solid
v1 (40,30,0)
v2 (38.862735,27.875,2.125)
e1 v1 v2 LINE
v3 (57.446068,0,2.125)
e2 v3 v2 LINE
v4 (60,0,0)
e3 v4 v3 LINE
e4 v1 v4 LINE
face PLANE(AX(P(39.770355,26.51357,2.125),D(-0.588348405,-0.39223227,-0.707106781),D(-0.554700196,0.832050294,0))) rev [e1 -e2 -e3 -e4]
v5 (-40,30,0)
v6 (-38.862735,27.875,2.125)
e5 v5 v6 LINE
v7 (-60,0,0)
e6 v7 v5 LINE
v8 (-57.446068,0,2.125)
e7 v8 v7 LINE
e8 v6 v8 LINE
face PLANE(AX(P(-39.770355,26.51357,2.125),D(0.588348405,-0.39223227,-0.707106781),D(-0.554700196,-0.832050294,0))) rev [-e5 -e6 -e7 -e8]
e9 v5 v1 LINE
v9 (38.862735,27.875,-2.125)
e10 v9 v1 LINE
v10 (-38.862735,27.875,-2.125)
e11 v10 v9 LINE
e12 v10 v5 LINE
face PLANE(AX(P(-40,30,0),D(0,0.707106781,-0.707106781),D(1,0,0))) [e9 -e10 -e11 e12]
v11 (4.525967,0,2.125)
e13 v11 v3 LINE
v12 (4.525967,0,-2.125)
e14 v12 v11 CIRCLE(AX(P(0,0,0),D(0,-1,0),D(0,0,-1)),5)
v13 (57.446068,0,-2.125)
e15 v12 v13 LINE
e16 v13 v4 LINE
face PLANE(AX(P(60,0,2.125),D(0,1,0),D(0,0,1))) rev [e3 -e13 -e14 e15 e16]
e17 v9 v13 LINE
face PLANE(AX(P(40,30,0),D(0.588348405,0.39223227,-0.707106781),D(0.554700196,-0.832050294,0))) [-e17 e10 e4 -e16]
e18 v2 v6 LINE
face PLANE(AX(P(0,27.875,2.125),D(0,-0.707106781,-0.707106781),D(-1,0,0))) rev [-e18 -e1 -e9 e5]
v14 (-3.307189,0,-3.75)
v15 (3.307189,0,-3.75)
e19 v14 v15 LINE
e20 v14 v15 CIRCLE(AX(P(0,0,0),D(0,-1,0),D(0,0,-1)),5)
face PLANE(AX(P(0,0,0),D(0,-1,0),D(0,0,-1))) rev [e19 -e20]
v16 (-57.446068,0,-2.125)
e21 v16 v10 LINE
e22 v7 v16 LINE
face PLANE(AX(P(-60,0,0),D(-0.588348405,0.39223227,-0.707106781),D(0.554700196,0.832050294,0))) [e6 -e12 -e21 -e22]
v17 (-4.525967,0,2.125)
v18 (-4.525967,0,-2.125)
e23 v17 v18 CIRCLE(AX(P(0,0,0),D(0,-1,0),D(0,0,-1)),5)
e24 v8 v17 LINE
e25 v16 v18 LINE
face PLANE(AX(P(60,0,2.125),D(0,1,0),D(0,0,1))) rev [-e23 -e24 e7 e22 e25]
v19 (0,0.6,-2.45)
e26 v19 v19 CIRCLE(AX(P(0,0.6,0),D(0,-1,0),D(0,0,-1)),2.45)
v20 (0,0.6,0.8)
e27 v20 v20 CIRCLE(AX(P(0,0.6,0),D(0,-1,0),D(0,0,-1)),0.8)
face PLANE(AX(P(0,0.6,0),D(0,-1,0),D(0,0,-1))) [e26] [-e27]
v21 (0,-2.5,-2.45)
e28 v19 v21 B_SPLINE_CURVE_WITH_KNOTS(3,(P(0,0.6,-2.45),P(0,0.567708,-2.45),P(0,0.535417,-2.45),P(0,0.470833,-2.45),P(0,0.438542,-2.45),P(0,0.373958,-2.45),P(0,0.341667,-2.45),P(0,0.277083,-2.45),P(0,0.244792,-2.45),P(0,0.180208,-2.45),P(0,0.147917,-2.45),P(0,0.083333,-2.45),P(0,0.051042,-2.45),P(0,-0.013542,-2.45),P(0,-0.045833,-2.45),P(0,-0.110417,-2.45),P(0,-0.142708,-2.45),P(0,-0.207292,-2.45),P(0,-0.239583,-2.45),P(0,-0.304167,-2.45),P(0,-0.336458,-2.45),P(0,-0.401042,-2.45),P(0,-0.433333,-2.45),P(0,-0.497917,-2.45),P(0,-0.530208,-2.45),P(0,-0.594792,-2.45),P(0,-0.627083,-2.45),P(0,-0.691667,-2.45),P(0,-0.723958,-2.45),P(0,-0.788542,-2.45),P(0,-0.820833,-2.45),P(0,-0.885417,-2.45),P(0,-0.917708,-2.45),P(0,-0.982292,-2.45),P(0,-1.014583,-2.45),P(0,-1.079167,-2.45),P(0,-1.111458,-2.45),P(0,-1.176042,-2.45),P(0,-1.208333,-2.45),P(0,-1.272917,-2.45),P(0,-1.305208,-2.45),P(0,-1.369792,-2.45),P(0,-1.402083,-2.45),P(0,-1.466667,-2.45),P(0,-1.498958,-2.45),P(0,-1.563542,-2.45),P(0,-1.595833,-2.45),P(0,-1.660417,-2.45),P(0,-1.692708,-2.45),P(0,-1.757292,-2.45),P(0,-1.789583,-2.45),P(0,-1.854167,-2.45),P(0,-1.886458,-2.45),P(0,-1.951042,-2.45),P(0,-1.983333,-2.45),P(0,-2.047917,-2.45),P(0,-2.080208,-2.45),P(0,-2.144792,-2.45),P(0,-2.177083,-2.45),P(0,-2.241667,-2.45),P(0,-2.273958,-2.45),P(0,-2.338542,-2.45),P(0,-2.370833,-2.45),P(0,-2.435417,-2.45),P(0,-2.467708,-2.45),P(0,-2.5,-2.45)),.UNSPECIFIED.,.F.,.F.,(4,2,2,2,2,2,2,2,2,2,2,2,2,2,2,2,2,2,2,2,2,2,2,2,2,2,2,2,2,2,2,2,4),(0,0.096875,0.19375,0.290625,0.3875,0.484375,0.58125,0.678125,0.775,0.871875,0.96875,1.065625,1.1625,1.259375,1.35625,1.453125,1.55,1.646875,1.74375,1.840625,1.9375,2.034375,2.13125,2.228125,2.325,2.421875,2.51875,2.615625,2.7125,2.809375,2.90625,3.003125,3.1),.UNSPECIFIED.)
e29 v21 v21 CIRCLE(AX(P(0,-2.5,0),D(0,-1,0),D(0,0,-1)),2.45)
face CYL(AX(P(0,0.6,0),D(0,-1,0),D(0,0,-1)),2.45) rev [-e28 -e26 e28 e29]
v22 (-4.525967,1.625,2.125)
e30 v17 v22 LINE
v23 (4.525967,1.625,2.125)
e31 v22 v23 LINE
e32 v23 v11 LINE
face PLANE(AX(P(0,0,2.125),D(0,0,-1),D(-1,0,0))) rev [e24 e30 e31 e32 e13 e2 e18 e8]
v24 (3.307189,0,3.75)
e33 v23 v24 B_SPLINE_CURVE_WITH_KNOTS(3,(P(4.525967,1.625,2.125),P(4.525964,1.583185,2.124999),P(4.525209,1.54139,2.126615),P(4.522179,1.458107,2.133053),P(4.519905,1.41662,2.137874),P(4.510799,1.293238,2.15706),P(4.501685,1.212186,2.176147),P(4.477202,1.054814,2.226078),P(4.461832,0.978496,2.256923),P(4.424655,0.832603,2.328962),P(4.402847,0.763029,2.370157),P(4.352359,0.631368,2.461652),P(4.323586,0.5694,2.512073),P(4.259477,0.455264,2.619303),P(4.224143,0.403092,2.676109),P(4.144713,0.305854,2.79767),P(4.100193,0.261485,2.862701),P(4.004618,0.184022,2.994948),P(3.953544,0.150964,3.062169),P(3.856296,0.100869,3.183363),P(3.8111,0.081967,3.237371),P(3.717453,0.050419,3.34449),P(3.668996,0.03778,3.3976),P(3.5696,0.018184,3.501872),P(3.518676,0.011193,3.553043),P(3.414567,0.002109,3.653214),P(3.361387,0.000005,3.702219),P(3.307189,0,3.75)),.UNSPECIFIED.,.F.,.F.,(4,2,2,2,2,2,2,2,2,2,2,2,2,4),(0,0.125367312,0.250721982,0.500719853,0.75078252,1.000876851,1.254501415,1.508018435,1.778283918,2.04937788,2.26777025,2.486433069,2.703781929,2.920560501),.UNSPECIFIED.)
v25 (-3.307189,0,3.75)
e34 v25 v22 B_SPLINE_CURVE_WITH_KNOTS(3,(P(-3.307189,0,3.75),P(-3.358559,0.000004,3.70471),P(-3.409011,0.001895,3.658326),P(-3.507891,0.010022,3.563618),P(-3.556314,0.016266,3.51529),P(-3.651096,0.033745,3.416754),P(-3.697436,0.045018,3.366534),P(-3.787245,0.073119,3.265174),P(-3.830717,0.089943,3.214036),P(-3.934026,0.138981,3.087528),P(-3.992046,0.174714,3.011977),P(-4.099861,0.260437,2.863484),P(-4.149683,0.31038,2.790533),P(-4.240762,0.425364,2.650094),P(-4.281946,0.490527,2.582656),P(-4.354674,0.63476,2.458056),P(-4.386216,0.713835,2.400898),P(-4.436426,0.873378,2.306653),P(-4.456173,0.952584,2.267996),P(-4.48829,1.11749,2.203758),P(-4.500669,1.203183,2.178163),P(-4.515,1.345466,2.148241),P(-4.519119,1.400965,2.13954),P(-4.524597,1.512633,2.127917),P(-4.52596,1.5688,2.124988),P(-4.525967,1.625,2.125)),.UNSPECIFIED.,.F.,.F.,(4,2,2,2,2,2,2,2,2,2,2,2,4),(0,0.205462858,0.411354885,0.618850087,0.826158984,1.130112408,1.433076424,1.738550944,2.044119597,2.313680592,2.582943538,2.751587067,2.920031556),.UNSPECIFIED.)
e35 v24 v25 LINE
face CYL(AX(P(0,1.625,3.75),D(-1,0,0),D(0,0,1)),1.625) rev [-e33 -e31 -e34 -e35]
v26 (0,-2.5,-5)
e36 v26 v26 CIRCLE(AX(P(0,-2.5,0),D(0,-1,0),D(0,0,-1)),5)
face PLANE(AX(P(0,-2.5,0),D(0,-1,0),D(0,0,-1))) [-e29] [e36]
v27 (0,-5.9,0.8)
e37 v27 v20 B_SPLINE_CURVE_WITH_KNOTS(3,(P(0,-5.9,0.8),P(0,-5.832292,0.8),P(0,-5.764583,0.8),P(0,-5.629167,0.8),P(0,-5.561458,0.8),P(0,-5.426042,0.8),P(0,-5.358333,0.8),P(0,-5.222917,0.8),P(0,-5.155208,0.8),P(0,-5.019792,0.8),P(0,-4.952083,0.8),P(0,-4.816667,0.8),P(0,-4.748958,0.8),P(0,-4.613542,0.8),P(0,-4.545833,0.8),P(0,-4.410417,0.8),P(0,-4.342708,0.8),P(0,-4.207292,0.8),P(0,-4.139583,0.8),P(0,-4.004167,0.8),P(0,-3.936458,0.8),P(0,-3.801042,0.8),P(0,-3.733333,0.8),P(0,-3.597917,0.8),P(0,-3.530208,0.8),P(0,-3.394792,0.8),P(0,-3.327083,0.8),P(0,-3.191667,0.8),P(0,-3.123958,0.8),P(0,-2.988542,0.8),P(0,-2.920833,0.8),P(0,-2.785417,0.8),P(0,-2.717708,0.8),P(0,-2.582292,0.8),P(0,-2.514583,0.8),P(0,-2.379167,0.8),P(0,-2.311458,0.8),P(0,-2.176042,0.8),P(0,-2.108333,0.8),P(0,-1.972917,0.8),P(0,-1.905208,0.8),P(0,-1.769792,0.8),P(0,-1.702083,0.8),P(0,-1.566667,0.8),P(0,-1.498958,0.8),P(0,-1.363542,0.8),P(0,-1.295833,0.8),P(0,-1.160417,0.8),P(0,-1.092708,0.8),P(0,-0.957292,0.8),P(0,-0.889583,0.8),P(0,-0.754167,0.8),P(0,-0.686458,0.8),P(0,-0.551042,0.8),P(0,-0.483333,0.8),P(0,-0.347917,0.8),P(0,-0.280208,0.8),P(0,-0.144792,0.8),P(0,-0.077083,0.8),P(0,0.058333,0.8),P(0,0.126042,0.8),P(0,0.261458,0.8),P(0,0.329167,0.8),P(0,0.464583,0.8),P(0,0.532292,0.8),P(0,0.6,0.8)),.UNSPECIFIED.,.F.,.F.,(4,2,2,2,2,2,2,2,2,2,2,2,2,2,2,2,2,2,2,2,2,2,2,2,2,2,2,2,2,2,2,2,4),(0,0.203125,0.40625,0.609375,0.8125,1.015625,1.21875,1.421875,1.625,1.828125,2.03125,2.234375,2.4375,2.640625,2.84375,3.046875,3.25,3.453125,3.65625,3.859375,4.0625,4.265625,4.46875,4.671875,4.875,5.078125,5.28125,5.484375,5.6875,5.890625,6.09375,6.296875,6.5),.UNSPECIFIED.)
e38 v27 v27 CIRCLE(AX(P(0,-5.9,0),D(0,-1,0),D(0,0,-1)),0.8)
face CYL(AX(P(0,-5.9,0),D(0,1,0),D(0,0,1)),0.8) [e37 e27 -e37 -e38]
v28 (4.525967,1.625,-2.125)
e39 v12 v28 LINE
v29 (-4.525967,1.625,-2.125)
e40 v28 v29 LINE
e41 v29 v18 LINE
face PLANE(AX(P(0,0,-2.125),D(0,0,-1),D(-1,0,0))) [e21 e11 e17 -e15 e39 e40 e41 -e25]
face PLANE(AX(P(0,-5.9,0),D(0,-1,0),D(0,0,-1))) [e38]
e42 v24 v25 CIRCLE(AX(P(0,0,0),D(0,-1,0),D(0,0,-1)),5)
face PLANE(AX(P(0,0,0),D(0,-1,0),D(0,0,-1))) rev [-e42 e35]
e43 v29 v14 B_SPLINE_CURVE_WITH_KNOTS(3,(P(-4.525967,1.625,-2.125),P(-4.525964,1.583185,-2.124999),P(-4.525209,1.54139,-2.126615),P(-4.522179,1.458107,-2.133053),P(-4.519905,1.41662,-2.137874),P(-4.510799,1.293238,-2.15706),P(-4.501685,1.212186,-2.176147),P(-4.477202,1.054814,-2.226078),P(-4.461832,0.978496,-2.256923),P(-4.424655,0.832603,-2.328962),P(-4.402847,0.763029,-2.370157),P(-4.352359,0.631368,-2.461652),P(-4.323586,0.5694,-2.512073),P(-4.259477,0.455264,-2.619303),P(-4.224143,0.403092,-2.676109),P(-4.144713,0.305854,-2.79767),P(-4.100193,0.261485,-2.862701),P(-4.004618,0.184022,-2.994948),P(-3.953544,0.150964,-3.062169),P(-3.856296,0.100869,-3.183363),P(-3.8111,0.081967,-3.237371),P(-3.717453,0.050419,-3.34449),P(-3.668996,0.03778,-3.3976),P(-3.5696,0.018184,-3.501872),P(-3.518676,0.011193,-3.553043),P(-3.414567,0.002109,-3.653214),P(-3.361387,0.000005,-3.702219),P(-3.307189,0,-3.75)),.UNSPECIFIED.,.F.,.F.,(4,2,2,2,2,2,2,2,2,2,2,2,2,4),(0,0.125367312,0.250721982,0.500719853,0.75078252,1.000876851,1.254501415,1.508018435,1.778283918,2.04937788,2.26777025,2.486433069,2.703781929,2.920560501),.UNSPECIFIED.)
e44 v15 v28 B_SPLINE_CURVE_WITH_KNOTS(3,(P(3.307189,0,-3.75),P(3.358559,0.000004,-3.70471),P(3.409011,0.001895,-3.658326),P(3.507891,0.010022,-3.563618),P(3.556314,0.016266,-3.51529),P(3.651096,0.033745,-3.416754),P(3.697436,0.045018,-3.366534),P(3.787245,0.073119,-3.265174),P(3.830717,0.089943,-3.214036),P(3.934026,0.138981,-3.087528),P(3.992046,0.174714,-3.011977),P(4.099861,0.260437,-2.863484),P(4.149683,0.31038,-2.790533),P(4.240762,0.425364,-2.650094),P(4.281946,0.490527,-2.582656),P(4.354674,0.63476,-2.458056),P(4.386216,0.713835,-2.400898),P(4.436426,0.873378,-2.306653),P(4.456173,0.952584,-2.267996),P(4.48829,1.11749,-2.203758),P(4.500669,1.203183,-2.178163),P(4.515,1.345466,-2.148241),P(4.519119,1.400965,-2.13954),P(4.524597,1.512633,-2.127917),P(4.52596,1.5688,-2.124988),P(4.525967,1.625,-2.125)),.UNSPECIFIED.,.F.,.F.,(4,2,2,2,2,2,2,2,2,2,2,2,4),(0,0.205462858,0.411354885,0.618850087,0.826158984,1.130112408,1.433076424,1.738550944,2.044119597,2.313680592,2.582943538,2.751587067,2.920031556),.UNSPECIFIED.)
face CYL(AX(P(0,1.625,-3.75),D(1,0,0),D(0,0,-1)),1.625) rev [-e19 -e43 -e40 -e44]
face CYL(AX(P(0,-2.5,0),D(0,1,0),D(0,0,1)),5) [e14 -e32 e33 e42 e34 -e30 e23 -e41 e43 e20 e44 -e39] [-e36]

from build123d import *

# Parameters (mm, degrees)
SALIENTE_EXTRUIR1_DEPTH = 2.125
CROQUIS2_R              = 5
SALIENTE_EXTRUIR2_DEPTH = 2.5
REDONDEO1_R             = 1.625
SKETCH1_R               = 2.45
CUT_EXTRUDE1_DEPTH      = 3.1
CHAMFER1_SIZE           = 2.125
CROQUIS3_R              = 0.8
SALIENTE_EXTRUIR3_DEPTH = 6.5


# Some blends are built 0.0001 mm under size
with BuildPart() as part:
    # Croquis1 → Saliente-Extruir1 (new, symmetric)
    with BuildSketch(Plane.XY):
        Polygon((60, 0), (-60, 0), (-40, 30), (40, 30), align=None)
    extrude(amount=SALIENTE_EXTRUIR1_DEPTH, both=True)

    # Croquis2 → Saliente-Extruir2 (add)
    with BuildSketch(Plane.XZ):
        with Locations(Location((0, 0, 0), (0, 0, 25.150663413))):
            Circle(CROQUIS2_R)
    extrude(amount=SALIENTE_EXTRUIR2_DEPTH)

    # Redondeo1
    # the kernel refuses this fillet: 1.625 mm, written as the material it adds along each edge
    with BuildSketch(Plane(origin=(8.588466748, 0, -2.125), x_dir=(0, 1, 0), z_dir=(-1, 0, 0))) as redondeo1_piece_1_section:
        with BuildLine():
            CenterArc((REDONDEO1_R, REDONDEO1_R), REDONDEO1_R, 180, 90)
            Line((0, REDONDEO1_R), (0, 0))
            Line((0, 0), (REDONDEO1_R, 0))
        make_face()
    redondeo1_piece_1 = extrude(amount=17.176933495, mode=Mode.PRIVATE)
    redondeo1_piece_1 = redondeo1_piece_1 & Plane(origin=(0, 0.370660795, 0), x_dir=(0.9051933495081991, 0, 0.4250000000072087), z_dir=(0, 1, 0)) * Cylinder(5, 41, mode=Mode.PRIVATE)
    add(redondeo1_piece_1)
    with BuildSketch(Plane(origin=(8.588466748, 0, 2.125), x_dir=(0, 1, 0), z_dir=(-1, 0, 0))) as redondeo1_piece_2_section:
        with BuildLine():
            CenterArc((REDONDEO1_R, -REDONDEO1_R), REDONDEO1_R, 90, 90)
            Line((0, -REDONDEO1_R), (0, 0))
            Line((0, 0), (REDONDEO1_R, 0))
        make_face()
    redondeo1_piece_2 = extrude(amount=17.176933495, mode=Mode.PRIVATE)
    redondeo1_piece_2 = redondeo1_piece_2 & Plane(origin=(0, 0.370660827, 0), x_dir=(0.9051933495081991, 0, 0.4250000000072087), z_dir=(0, 1, 0)) * Cylinder(5, 41, mode=Mode.PRIVATE)
    add(redondeo1_piece_2)

    # Sketch1 → Cut-Extrude1 (cut)
    with BuildSketch(Plane.XZ.offset(2.5)):
        with Locations(Location((0, 0, 0), (0, 0, 270))):
            Circle(SKETCH1_R)
    extrude(amount=-CUT_EXTRUDE1_DEPTH, mode=Mode.SUBTRACT)

    # Chamfer1
    chamfer1_edges = [part.edges().sort_by_distance(p)[0] for p in [
        (50, 15, -2.125),
        (0, 30, -2.125),
        (-50, 15, -2.125),
        (50, 15, 2.125),
        (0, 30, 2.125),
        (-50, 15, 2.125),
    ]]
    chamfer(chamfer1_edges, length=CHAMFER1_SIZE - 0.0001)  # a hair under: the kernel refuses the full size

    # Croquis3 → Saliente-Extruir3 (add)
    with BuildSketch(Plane.XZ.offset(-0.6)):
        with Locations(Location((0, 0, 0), (0, 0, 90))):
            Circle(CROQUIS3_R)
    extrude(amount=SALIENTE_EXTRUIR3_DEPTH)


solid = part.part
